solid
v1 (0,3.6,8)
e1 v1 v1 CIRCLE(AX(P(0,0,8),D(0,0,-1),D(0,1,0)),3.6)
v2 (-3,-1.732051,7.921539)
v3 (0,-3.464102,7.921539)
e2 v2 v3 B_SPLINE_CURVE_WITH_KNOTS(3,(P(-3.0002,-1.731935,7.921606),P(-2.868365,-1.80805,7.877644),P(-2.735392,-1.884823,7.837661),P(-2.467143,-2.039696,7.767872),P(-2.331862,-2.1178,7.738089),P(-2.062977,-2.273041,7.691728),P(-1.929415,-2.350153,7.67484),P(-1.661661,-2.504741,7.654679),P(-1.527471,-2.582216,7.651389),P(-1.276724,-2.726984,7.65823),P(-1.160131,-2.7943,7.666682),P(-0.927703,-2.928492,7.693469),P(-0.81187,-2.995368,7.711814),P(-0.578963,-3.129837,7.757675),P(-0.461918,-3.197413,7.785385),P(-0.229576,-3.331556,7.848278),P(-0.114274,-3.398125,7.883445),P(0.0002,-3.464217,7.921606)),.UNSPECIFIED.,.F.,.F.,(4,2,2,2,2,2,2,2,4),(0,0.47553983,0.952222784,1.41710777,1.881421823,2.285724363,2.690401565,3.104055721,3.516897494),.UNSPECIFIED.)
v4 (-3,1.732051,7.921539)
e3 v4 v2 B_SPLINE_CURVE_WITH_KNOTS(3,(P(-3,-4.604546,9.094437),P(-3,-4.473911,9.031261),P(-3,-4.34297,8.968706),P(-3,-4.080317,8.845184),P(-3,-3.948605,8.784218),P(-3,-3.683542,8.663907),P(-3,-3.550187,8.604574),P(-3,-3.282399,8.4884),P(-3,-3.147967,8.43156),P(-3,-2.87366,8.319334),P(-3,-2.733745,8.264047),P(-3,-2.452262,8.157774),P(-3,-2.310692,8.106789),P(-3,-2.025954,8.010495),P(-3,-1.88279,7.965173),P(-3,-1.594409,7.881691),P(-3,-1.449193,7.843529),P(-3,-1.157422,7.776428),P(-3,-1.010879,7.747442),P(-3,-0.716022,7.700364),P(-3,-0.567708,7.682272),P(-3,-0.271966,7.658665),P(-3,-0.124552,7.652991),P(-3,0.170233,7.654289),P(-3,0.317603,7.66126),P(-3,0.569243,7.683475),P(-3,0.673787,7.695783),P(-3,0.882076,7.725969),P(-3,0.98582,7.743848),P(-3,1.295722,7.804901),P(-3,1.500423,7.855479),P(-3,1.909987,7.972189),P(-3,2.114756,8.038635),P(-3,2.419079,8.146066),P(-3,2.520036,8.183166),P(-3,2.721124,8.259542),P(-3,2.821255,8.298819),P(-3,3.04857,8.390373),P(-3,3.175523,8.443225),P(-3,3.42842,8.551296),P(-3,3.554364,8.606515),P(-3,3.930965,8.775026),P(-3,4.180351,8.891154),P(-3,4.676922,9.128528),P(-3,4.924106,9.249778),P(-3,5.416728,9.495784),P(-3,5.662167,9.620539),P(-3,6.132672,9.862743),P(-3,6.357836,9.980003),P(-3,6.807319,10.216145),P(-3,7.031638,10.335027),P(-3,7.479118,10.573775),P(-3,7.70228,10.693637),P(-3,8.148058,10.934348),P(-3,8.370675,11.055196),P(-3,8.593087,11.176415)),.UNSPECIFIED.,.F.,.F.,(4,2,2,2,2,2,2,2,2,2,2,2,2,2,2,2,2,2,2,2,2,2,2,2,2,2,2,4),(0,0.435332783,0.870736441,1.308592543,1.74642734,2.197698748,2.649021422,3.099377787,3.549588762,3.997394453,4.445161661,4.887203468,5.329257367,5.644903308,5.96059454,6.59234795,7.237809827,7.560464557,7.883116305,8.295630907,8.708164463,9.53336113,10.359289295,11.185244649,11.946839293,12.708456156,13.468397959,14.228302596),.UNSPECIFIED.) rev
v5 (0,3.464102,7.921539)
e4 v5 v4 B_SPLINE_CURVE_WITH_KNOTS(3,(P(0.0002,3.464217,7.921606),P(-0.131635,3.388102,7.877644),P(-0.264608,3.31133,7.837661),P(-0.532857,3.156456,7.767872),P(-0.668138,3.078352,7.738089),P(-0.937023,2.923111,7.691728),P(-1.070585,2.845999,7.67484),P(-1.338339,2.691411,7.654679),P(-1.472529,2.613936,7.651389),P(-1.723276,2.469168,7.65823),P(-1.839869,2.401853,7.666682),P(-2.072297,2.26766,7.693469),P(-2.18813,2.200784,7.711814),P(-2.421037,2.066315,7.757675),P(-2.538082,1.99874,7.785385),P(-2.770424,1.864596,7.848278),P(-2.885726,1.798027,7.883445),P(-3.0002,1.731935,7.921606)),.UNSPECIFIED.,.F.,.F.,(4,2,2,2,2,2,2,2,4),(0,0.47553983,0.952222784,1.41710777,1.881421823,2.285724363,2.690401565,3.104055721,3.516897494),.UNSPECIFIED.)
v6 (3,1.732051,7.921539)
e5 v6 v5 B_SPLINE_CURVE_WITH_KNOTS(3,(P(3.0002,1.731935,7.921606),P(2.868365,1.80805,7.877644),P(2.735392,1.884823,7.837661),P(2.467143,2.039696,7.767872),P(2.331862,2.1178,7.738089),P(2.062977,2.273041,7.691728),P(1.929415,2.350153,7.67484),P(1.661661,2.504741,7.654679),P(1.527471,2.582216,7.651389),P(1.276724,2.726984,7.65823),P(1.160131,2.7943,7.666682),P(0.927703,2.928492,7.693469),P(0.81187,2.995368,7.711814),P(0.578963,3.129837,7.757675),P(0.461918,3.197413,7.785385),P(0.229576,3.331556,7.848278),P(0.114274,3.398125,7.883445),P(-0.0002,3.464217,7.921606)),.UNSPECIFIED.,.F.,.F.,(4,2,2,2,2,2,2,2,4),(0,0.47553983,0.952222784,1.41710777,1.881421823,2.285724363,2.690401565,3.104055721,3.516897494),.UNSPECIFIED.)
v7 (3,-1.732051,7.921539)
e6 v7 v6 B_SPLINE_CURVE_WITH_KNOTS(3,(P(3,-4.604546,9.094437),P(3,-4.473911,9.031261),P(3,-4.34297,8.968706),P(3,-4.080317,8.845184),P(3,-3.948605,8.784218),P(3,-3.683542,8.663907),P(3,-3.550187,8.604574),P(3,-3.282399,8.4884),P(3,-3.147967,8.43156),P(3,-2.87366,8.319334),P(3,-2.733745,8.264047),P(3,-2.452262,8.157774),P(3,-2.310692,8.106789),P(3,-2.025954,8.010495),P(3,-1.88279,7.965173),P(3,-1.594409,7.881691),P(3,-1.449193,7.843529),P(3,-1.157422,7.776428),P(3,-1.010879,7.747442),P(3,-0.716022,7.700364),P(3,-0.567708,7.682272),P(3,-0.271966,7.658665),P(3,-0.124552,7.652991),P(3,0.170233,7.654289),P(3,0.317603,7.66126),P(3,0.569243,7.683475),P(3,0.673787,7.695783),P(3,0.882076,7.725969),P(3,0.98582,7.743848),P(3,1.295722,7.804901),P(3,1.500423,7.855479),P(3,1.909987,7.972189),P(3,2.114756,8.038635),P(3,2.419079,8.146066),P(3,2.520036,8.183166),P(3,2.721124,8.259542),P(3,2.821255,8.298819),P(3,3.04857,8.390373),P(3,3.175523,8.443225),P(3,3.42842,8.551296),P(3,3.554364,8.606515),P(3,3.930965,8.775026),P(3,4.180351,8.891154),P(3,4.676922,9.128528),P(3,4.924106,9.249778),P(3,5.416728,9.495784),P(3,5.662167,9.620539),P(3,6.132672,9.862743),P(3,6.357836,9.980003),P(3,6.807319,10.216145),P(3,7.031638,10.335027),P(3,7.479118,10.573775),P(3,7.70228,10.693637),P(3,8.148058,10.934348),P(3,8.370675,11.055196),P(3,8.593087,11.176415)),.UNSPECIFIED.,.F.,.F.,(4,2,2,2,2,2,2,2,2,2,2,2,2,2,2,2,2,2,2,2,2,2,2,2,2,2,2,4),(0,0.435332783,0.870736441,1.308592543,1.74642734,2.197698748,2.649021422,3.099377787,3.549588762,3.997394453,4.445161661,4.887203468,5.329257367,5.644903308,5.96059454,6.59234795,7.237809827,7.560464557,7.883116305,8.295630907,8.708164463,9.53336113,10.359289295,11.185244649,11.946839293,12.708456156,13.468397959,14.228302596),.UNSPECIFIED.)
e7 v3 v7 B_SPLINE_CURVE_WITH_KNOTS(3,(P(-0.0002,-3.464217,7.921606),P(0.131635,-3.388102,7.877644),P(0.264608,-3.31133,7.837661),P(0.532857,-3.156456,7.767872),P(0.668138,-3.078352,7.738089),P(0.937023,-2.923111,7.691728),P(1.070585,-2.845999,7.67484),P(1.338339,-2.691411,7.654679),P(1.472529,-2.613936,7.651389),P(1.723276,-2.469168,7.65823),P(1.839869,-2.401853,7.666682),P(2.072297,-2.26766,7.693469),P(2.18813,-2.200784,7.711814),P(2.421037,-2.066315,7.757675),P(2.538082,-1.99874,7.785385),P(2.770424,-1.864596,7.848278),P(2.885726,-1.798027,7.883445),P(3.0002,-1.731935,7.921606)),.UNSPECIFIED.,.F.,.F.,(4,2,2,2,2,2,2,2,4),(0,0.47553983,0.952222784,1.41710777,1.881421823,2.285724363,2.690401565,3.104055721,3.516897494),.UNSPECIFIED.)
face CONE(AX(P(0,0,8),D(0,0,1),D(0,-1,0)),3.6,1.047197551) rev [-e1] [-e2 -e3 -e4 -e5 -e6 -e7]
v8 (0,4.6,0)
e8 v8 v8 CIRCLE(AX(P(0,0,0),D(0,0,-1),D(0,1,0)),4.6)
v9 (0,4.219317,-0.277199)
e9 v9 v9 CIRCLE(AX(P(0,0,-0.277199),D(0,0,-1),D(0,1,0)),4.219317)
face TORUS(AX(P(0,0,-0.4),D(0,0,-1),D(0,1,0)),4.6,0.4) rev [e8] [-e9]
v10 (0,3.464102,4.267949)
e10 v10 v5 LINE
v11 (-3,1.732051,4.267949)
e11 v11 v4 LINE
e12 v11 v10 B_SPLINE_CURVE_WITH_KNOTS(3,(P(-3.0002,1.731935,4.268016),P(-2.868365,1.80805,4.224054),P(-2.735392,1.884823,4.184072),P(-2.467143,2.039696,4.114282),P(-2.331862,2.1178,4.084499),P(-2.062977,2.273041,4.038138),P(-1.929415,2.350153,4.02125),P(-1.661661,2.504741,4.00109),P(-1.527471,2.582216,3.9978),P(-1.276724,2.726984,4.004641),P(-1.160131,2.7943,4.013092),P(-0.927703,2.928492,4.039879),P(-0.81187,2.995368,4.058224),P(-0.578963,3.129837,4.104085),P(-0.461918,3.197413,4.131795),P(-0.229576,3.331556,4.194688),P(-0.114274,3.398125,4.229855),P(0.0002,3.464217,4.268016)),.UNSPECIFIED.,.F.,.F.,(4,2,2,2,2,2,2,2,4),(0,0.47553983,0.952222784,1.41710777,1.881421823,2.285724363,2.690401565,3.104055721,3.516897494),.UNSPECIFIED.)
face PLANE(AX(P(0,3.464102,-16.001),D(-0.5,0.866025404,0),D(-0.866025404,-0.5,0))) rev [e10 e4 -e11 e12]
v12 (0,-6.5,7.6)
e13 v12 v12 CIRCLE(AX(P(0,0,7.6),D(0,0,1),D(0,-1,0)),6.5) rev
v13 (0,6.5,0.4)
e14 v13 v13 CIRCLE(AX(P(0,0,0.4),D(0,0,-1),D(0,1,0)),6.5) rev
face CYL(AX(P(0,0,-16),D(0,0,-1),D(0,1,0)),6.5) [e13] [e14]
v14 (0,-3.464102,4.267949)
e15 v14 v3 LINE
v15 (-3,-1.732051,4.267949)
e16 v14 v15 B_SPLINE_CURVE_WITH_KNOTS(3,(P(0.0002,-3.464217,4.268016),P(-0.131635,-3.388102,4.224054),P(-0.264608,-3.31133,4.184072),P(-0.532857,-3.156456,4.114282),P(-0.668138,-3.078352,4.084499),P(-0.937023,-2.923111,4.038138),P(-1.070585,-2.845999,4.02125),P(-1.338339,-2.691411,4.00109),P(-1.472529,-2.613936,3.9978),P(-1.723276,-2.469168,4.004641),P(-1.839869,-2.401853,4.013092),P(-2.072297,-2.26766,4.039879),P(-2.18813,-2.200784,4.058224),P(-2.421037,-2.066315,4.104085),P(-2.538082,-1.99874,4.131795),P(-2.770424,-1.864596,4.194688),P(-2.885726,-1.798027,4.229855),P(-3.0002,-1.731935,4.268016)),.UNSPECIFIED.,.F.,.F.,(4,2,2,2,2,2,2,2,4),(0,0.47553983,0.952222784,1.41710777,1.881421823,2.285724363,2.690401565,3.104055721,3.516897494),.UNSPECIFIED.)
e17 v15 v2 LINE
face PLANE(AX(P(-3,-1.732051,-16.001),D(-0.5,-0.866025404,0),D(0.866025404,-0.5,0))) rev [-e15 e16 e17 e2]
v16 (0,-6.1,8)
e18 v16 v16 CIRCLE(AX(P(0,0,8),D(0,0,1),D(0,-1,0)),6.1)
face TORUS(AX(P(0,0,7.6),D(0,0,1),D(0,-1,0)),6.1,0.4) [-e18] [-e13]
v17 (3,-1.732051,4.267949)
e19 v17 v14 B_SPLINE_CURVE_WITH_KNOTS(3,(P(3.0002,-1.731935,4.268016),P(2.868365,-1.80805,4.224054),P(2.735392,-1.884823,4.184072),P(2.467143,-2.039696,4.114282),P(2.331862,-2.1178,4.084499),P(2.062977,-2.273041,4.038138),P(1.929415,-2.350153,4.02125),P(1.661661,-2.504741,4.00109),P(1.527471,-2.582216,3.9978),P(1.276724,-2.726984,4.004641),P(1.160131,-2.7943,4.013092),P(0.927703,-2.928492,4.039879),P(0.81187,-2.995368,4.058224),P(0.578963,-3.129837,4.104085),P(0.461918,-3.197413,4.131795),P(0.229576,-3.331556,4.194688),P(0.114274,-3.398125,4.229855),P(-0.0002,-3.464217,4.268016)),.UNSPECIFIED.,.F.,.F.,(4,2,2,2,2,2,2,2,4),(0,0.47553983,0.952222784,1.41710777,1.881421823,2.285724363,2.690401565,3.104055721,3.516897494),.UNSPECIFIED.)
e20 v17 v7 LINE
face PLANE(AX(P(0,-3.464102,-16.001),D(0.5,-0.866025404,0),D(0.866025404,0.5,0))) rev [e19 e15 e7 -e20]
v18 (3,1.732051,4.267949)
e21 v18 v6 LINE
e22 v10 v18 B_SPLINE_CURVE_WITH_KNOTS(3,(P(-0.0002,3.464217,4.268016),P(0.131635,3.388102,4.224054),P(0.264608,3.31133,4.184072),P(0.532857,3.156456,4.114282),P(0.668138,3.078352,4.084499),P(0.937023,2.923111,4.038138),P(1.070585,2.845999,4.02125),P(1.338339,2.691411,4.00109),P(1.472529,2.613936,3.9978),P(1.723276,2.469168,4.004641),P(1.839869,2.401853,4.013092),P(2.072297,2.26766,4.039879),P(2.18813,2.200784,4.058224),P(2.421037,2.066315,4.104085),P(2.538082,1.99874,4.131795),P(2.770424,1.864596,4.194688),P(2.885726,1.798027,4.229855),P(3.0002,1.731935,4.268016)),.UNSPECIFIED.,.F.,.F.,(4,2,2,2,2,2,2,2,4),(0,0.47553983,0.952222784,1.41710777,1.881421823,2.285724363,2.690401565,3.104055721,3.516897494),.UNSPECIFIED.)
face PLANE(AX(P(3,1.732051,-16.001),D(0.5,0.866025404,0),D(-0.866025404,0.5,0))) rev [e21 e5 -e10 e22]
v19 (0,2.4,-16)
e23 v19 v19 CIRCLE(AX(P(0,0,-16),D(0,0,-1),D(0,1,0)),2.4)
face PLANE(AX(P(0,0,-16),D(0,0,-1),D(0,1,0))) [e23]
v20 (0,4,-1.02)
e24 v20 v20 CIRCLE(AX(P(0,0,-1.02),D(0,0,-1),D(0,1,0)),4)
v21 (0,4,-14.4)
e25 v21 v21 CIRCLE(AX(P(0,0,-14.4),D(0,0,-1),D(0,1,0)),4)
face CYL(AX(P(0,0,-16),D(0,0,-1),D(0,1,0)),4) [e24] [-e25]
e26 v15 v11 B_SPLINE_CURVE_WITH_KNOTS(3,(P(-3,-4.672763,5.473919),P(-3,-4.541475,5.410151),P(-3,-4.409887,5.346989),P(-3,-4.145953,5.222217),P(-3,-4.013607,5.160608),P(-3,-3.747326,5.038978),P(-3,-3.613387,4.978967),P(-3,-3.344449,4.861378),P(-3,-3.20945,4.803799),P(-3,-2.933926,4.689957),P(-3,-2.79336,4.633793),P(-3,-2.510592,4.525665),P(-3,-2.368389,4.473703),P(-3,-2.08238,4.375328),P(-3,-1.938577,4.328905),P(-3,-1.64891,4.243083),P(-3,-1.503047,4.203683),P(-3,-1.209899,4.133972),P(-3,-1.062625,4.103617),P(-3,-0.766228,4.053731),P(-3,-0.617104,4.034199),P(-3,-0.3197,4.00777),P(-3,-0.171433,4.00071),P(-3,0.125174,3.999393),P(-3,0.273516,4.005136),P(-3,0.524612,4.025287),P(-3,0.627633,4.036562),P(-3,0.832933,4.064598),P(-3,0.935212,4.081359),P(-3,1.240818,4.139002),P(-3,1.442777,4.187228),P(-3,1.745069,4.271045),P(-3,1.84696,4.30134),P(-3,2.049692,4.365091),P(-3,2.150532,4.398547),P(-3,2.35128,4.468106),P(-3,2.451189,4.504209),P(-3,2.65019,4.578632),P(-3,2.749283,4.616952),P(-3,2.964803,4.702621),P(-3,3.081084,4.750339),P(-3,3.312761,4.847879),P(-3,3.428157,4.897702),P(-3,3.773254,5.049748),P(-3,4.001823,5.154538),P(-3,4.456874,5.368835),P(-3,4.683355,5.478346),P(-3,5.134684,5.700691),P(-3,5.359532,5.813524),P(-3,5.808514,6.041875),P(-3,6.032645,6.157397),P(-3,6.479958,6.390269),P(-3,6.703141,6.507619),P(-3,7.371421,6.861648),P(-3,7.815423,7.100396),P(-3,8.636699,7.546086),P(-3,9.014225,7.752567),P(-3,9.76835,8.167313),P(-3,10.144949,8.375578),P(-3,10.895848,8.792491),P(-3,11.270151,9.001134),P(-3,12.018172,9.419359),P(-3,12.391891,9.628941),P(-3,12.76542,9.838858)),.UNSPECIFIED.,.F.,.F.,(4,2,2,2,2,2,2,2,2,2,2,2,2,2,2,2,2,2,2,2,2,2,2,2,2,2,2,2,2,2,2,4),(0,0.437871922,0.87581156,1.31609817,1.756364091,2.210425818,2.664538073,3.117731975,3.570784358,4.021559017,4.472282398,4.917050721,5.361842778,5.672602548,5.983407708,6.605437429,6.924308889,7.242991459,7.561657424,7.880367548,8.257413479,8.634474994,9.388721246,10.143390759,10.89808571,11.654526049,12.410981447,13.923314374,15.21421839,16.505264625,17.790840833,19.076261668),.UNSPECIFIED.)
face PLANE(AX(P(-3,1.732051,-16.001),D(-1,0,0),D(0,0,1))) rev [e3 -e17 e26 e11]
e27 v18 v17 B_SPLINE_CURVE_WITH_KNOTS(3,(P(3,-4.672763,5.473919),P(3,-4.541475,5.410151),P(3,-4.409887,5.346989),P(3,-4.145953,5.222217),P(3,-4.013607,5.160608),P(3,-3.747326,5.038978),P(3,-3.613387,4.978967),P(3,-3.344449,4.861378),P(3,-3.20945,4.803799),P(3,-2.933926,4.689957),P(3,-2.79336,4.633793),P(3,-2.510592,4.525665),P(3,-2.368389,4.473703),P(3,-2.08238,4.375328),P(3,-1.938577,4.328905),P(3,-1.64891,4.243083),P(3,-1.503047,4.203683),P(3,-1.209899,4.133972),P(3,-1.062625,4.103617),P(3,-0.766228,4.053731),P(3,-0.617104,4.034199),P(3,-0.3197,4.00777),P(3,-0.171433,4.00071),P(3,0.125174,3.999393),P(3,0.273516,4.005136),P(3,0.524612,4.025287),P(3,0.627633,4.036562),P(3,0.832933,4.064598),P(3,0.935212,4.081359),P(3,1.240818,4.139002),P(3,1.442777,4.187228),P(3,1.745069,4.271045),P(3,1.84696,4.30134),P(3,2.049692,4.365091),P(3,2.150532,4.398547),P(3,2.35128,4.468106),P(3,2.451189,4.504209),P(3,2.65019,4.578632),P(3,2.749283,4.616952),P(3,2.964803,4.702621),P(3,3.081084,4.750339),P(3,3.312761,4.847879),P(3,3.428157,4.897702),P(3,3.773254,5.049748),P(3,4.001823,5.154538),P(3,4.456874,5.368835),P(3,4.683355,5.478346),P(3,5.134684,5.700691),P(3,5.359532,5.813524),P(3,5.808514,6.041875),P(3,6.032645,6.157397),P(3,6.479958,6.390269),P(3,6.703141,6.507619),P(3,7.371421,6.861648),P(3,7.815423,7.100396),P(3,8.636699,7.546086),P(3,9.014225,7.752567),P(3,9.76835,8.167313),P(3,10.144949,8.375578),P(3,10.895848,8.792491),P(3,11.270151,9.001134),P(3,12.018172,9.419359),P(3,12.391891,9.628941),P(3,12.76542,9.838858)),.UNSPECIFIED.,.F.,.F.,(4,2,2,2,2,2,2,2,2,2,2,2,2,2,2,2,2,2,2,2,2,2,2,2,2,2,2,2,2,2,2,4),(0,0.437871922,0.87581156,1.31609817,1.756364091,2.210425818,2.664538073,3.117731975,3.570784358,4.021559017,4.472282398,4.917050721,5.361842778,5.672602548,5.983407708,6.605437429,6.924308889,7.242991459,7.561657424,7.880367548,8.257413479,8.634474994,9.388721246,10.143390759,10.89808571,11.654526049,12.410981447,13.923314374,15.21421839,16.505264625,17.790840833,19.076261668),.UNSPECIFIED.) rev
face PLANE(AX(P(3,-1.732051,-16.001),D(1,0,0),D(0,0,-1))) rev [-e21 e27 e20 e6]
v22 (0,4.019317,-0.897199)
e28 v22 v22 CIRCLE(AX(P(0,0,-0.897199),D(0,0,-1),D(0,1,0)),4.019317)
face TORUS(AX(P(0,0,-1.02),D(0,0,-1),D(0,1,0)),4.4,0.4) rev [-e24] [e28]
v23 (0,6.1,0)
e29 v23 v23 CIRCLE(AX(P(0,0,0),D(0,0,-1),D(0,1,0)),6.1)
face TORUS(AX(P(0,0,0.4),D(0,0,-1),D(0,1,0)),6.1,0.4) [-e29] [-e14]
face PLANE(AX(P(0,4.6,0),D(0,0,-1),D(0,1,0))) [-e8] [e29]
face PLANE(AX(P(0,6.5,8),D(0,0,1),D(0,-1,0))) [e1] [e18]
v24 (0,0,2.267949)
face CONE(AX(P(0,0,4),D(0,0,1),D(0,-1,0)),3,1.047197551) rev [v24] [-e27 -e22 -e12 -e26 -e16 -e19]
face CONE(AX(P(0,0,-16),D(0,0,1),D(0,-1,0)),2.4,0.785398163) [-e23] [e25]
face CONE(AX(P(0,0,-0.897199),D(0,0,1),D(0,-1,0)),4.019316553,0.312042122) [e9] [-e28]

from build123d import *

# Parameters (mm, degrees)
CUT_EXTRUDE_START   = -4.0000001
CUT_EXTRUDE_1_DEPTH = 3.921539232
FILLET_1_R          = 0.4


with BuildPart() as part:
    # Эскиз1 → Повернуть1 (revolve)
    with BuildSketch(Plane(origin=(0, 0, 0), x_dir=(0, 0, -1), z_dir=(1, 0, 0))):
        with BuildLine():
            Line((16, 0), (16, 2.4))
            Line((16, 2.4), (14.4, 4))
            Line((14.4, 4), (1.02, 4))
            ThreePointArc((1.02, 4), (0.957844465, 4.004858646), (0.897198888, 4.019316553))
            Line((0.897198888, 4.019316553), (0.277198888, 4.219316553))
            ThreePointArc((0.277198888, 4.219316553), (0.076642269, 4.36454347), (0, 4.6))
            Line((0, 4.6), (0, 6.5))
            Line((0, 6.5), (-8, 6.5))
            Line((-8, 6.5), (-8, 3.6))
            Line((-8, 3.6), (-7.653589838, 3))
            Line((-7.653589838, 3), (-4, 3))
            Line((-4, 3), (-2.267949192, 0))
            Line((-2.267949192, 0), (16, 0))
        make_face()
    revolve(axis=Axis((0, 0, -16), (0, 0, 1)))

    # Вырез-Вытянуть1: read off the stored shape, not the designer's step
    # Вырез-Вытянуть1 outline → Вырез-Вытянуть1 (cut)
    with BuildSketch(Plane.XY.offset(8).offset(CUT_EXTRUDE_START)):
        with BuildLine():
            Line((3, 0), (3, 1.732050808))
            Line((3, 1.732050808), (1.499999997, 2.598076213))
            ThreePointArc((1.499999997, 2.598076213), (2.59807621, 1.500000002), (3, 0))
        make_face()
        with BuildLine():
            ThreePointArc((-1.499999956, 2.598076237), (2.4e-08, 3), (1.499999997, 2.598076213))
            Line((1.499999997, 2.598076213), (0, 3.464101615))
            Line((0, 3.464101615), (-1.499999956, 2.598076237))
        make_face()
        with BuildLine():
            Line((3, -1.732050808), (3, 0))
            ThreePointArc((3, 0), (2.59807621, -1.500000002), (1.499999997, -2.598076213))
            Line((1.499999997, -2.598076213), (3, -1.732050808))
        make_face()
        with BuildLine():
            ThreePointArc((-3, 0), (-2.598076199, 1.500000022), (-1.499999956, 2.598076237))
            Line((-1.499999956, 2.598076237), (-3, 1.732050808))
            Line((-3, 1.732050808), (-3, 0))
        make_face()
        with BuildLine():
            Line((0, -3.464101615), (1.499999997, -2.598076213))
            ThreePointArc((1.499999997, -2.598076213), (0, -3), (-1.499999997, -2.598076213))
            Line((-1.499999997, -2.598076213), (0, -3.464101615))
        make_face()
        with BuildLine():
            ThreePointArc((-1.499999997, -2.598076213), (-2.59807621, -1.500000002), (-3, 0))
            Line((-3, 0), (-3, -1.732050808))
            Line((-3, -1.732050808), (-1.499999997, -2.598076213))
        make_face()
    extrude(amount=CUT_EXTRUDE_1_DEPTH, mode=Mode.SUBTRACT)

    # Cut-Extrude 1 2 outline → Cut-Extrude 1 2 (revolve)
    with BuildSketch(Plane.XZ):
        Polygon((3.464101616, 4.267949193), (2.999999957, 3.999999975), (3.464101615, 3.9999999), align=None)
    revolve(axis=Axis((0, 0, 0), (0, 0, 1)))

    # Скругление1
    fillet_1_edges = [part.edges().sort_by_distance(p)[0] for p in [
        (0, -6.5, 0),
        (0, -6.5, 8),
    ]]
    fillet(fillet_1_edges, radius=FILLET_1_R)


solid = part.part
